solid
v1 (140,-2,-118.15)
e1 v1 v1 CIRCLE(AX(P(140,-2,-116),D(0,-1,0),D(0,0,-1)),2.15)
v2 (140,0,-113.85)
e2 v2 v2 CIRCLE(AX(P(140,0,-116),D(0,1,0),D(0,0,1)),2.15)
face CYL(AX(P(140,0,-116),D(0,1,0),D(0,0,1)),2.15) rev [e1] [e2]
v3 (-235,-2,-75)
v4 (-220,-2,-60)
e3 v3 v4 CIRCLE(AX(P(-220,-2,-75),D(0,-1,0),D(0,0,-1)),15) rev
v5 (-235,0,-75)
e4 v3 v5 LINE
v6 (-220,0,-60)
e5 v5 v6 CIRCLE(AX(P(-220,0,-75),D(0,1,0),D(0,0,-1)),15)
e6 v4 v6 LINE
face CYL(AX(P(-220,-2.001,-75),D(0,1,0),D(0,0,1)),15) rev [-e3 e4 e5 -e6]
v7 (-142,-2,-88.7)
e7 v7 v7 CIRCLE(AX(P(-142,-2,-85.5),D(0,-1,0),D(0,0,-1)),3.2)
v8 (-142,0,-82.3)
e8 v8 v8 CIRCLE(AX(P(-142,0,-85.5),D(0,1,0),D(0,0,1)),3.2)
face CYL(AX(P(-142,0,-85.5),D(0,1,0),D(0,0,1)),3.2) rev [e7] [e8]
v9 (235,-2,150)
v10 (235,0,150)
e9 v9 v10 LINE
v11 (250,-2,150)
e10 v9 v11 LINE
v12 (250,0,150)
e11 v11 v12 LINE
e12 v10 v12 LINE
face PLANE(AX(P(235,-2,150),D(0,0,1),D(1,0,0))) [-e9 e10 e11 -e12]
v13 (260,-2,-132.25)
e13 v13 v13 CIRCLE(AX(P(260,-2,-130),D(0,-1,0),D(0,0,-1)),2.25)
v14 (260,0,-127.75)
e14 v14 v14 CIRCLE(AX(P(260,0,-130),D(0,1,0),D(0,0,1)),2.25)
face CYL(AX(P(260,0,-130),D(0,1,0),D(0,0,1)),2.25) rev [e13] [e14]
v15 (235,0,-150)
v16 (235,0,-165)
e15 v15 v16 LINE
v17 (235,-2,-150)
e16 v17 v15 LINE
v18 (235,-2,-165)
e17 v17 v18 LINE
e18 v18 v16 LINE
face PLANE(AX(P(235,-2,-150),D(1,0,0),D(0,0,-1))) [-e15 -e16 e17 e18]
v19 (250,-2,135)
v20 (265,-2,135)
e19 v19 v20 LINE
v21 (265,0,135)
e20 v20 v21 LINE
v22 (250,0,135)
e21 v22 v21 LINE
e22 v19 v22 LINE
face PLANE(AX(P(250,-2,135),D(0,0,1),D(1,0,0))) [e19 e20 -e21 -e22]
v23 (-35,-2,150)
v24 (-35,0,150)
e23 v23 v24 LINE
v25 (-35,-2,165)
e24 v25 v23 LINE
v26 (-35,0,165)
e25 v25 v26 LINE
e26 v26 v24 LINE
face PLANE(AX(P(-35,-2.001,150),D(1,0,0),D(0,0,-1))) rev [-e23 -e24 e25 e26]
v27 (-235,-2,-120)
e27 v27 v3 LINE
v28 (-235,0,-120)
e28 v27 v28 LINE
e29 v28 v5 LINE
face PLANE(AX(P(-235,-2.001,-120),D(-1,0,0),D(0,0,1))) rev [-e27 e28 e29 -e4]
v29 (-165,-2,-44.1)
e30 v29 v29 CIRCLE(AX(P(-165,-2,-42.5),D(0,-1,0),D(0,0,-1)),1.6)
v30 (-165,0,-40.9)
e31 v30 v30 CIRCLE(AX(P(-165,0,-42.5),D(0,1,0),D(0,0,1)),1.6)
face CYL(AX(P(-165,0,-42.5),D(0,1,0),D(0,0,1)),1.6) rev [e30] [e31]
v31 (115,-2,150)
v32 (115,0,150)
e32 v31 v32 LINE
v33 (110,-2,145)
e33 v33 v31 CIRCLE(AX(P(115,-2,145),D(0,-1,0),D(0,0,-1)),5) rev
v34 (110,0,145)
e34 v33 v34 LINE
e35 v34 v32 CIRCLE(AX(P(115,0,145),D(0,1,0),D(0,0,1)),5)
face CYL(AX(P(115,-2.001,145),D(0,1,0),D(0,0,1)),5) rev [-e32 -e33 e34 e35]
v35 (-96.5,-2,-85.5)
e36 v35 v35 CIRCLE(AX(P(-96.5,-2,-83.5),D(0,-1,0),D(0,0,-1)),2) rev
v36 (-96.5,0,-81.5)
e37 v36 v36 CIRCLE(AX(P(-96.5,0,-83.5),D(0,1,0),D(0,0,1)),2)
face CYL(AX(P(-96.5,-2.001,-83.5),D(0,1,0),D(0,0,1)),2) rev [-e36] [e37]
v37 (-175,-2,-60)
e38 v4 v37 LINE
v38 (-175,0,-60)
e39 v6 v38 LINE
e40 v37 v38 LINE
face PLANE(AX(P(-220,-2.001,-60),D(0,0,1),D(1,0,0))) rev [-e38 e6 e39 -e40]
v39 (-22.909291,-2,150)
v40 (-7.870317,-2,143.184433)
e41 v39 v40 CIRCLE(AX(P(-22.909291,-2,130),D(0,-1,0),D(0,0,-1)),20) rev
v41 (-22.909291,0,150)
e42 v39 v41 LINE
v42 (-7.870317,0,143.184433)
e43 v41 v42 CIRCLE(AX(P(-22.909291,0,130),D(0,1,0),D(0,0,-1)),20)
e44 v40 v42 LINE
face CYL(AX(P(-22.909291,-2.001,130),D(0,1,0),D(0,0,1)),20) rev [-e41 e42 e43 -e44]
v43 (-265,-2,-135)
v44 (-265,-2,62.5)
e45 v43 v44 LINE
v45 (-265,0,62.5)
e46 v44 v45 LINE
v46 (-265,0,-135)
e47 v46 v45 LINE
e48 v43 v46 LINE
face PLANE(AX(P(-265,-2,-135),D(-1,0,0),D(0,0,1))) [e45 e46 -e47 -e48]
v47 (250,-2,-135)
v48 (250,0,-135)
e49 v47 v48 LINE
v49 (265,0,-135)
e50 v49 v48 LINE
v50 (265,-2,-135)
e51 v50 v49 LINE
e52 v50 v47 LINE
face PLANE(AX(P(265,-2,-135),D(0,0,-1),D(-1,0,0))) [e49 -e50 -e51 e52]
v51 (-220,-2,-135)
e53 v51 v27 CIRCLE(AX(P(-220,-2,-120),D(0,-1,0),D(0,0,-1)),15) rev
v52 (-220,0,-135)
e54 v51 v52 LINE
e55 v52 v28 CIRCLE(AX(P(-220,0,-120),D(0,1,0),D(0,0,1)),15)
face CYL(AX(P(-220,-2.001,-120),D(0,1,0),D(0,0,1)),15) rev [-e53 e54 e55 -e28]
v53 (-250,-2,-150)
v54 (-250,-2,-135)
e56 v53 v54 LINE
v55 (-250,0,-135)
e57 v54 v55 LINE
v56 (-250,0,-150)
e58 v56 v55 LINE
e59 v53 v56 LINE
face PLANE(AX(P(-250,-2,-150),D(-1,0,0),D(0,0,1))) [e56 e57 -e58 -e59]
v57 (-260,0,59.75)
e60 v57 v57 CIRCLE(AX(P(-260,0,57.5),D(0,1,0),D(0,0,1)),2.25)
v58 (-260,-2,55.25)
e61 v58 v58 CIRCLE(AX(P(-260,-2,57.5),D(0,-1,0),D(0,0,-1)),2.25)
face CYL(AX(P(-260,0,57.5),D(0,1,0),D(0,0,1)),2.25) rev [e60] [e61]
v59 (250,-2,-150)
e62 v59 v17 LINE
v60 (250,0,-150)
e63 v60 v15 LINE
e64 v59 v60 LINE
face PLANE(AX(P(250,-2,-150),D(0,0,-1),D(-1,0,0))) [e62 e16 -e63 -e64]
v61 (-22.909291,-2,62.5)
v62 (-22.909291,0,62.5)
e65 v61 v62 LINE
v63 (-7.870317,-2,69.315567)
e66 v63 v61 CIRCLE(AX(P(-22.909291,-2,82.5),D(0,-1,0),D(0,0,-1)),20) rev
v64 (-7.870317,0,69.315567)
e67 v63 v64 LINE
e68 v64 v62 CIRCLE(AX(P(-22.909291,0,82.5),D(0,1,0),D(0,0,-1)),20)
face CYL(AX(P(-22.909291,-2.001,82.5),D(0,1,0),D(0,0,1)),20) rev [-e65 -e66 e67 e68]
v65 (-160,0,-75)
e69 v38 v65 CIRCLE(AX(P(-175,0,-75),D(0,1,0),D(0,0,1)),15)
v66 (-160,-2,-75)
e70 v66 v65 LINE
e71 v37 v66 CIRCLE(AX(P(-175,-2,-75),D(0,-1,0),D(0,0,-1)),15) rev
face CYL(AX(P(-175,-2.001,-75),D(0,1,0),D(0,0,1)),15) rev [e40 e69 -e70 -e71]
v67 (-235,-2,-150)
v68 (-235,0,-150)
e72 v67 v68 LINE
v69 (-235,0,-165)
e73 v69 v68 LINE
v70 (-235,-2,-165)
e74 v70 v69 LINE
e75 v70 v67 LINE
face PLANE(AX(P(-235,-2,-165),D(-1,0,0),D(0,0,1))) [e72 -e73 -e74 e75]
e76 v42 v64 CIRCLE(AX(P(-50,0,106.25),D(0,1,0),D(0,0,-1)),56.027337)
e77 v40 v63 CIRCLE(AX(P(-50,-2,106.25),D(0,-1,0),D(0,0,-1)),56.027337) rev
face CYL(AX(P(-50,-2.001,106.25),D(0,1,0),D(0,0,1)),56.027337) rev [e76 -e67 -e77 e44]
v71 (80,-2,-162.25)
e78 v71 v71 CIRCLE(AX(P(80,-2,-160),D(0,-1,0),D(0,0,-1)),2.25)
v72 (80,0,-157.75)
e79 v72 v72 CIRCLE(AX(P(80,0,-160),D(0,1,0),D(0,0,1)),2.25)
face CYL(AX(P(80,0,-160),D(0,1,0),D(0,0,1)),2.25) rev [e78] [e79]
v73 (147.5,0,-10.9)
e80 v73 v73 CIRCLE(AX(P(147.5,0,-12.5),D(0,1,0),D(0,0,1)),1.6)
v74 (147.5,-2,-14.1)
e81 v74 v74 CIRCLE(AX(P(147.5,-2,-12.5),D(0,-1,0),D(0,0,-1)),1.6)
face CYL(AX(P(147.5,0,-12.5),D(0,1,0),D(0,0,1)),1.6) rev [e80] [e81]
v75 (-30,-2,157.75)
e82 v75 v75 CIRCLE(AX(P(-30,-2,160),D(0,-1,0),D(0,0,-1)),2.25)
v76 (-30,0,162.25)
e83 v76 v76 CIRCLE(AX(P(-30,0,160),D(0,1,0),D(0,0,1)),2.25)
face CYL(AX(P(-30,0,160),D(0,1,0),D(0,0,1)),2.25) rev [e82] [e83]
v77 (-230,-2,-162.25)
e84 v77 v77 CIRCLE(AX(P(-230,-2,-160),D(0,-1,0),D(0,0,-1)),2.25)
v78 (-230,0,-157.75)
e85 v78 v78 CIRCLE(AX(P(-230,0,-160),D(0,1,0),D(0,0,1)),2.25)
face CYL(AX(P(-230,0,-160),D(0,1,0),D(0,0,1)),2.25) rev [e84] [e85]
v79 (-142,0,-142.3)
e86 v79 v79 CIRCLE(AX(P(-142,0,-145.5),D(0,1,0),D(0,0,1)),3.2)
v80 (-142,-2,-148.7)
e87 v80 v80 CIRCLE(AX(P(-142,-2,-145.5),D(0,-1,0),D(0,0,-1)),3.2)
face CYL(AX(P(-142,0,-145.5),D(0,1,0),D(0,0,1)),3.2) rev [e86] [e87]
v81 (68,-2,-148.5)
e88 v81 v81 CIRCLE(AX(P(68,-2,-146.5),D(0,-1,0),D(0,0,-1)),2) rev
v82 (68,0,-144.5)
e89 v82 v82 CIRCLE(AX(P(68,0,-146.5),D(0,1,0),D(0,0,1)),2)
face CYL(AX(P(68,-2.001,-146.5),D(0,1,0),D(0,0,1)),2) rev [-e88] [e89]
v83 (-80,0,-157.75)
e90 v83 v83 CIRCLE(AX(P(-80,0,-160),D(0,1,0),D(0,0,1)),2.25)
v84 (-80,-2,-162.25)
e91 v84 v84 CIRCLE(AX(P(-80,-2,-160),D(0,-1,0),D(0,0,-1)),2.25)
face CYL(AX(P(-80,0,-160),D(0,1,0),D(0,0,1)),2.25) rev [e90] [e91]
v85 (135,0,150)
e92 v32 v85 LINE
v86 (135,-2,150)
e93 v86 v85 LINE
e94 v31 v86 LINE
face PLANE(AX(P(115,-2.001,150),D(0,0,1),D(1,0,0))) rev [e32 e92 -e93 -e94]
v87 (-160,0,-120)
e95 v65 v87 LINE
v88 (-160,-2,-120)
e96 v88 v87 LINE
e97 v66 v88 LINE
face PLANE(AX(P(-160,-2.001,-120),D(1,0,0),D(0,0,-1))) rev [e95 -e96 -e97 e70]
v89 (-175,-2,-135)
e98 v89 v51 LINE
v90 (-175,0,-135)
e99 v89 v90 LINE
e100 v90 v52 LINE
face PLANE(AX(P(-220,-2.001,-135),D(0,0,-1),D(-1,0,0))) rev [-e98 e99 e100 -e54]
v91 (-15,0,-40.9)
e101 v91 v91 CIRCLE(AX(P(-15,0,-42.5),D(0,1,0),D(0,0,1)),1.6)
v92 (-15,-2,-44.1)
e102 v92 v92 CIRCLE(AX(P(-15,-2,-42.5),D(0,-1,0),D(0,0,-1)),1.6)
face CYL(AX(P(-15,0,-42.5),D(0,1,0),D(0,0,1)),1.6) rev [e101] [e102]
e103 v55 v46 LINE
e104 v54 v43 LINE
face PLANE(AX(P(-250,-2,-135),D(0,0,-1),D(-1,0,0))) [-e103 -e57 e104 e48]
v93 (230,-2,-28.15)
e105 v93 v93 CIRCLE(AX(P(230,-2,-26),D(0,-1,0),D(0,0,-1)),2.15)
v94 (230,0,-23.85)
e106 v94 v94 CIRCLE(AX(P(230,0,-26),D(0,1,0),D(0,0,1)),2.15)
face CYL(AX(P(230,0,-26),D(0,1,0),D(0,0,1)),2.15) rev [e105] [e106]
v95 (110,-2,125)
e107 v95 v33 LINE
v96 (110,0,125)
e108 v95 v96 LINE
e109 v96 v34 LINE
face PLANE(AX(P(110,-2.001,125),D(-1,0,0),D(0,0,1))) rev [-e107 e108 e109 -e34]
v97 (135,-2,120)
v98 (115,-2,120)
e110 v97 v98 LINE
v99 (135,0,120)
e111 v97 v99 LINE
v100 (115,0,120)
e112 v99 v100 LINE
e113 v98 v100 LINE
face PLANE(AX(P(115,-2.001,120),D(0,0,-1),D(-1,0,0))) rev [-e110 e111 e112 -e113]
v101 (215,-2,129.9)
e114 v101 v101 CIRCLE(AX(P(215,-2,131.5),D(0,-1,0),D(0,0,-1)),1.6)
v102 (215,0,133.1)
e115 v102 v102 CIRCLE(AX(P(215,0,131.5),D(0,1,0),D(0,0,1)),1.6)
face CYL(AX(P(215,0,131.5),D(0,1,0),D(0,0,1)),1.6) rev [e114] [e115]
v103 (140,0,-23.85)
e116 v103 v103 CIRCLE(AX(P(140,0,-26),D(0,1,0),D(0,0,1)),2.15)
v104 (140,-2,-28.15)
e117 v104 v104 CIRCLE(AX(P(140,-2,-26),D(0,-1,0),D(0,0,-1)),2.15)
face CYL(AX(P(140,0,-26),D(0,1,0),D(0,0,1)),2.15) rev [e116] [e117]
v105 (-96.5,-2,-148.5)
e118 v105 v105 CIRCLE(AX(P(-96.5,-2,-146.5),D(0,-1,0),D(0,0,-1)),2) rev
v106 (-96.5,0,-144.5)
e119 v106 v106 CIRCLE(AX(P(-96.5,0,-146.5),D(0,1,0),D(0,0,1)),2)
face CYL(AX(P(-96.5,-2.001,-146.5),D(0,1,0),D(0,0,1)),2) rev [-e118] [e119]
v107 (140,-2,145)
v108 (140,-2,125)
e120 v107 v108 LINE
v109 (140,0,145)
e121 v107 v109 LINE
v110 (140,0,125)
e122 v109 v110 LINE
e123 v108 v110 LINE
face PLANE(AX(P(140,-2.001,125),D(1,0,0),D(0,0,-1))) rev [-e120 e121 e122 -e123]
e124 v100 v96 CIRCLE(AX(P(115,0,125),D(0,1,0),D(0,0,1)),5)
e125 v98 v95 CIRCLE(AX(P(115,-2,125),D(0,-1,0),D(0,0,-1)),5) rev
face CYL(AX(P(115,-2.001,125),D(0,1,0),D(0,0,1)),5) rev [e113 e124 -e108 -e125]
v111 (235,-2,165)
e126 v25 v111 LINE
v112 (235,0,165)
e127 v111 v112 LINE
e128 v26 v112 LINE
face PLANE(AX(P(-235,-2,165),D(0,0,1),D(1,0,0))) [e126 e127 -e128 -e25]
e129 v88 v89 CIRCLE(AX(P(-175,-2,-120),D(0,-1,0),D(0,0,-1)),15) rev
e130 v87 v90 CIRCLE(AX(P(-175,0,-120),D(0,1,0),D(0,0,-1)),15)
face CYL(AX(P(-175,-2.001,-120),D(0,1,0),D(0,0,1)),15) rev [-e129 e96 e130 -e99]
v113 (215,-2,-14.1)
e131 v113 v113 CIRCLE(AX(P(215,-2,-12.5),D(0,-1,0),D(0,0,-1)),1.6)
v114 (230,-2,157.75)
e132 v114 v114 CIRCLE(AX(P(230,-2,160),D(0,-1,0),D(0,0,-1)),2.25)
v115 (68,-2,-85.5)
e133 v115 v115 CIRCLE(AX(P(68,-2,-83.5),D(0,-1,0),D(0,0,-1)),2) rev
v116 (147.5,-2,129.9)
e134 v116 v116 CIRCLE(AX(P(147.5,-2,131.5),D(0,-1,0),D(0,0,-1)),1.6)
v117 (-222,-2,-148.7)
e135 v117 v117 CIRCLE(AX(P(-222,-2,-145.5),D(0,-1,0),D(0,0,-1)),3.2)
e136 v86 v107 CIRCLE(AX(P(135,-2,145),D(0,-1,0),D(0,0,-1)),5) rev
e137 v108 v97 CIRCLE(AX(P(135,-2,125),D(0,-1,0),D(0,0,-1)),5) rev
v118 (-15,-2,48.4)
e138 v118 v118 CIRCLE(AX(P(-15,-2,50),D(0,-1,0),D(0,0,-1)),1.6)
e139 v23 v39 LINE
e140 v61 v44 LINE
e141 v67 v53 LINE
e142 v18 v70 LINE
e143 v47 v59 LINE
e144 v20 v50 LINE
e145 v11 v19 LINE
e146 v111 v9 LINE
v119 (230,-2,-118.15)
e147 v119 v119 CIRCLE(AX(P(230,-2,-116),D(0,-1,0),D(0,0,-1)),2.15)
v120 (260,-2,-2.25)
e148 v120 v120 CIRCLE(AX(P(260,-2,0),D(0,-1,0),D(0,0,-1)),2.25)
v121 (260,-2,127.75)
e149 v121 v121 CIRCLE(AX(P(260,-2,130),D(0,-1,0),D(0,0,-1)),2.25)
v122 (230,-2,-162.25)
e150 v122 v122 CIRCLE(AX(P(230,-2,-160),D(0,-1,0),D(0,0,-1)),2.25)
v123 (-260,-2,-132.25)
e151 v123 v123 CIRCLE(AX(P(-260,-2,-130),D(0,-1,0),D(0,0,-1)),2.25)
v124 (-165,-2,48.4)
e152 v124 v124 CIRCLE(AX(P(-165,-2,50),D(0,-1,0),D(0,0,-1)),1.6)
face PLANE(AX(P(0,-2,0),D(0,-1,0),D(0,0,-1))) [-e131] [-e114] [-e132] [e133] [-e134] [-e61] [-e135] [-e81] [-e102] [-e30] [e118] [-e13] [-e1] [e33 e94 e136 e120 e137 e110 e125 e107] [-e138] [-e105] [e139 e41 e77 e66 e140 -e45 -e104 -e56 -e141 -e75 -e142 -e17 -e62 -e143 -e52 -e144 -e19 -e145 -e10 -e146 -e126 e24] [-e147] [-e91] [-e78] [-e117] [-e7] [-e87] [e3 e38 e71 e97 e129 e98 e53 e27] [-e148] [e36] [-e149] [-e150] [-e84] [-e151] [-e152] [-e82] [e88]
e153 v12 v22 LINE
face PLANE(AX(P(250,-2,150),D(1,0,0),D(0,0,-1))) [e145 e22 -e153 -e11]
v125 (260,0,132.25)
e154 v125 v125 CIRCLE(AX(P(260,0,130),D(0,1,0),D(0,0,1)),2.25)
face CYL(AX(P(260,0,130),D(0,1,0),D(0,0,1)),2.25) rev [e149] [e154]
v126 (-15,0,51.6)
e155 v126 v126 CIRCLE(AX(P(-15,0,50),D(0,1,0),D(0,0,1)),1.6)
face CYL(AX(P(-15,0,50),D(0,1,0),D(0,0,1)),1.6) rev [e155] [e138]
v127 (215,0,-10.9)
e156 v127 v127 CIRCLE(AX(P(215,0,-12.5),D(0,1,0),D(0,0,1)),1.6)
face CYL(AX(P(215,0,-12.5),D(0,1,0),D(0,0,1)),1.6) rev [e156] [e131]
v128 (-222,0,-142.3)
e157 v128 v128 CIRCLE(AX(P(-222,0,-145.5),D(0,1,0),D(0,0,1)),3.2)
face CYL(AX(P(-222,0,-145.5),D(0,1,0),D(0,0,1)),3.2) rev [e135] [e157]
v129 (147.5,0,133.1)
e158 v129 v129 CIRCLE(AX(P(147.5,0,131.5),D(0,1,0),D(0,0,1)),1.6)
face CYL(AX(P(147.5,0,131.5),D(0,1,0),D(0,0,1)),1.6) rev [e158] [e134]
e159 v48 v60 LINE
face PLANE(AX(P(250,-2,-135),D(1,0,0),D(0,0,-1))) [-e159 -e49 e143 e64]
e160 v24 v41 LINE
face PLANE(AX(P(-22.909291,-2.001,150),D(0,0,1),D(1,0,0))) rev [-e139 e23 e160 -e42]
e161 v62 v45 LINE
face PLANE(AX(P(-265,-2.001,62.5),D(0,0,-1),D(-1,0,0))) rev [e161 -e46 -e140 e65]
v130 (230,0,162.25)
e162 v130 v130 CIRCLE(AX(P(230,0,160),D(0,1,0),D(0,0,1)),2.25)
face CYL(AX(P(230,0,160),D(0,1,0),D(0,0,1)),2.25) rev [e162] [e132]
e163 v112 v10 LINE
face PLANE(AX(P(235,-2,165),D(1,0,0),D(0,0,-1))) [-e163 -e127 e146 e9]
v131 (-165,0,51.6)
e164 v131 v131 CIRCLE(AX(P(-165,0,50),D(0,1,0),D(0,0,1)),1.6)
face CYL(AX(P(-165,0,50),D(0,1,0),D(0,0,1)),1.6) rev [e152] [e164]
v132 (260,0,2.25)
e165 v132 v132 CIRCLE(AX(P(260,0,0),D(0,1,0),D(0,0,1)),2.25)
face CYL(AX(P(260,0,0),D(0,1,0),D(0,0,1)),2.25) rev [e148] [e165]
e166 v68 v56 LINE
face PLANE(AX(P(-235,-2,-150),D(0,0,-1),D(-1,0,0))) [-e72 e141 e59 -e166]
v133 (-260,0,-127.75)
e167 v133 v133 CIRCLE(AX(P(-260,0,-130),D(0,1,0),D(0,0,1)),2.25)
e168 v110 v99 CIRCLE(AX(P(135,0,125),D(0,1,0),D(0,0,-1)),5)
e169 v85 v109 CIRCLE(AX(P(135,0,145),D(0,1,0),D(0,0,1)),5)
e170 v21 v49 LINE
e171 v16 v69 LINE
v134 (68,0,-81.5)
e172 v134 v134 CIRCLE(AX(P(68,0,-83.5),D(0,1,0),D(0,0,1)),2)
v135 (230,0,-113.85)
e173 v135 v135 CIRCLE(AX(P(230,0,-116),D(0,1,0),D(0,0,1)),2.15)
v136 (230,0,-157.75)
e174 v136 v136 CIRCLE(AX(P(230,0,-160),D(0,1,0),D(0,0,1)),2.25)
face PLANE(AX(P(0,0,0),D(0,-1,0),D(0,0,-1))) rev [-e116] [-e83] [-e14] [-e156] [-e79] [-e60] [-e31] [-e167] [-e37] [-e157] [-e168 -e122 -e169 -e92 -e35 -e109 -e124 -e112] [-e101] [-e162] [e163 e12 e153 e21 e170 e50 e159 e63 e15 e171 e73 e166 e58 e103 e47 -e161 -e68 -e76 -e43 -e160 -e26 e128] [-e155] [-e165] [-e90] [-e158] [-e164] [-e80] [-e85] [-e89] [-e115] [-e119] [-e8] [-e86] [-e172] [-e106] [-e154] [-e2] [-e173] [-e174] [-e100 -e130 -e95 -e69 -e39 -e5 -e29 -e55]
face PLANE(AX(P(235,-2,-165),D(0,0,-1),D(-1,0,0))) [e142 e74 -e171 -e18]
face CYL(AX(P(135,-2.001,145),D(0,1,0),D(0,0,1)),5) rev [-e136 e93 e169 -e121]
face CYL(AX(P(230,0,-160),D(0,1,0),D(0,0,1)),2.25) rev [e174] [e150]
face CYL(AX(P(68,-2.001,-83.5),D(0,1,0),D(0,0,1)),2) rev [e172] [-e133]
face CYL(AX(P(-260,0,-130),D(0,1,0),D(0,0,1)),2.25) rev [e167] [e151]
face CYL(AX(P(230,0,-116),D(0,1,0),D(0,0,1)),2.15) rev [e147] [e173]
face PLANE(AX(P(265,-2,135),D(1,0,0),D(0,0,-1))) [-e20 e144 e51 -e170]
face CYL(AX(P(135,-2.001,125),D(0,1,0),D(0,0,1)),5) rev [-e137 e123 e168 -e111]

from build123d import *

# Parameters (mm, degrees)
BASE_FLANGE1_DEPTH   = 2
CUT_EXTRUDE1_REACH   = 314.176
CUT_EXTRUDE2_REACH   = 314.176
CUT_EXTRUDE3_REACH   = 314.176
M4_CLEARANCE_HOLE1_D = 4.5
CUT_EXTRUDE4_REACH   = 314.176
SKETCH7_R            = 2
M3_CLEARANCE_HOLE1_D = 3.2
M6_CLEARANCE_HOLE1_D = 6.4
M4_CLEARANCE_HOLE2_D = 4.3


# Sheet-metal steps are written as plain solids
with BuildPart() as part:
    # Sketch1 → Base-Flange1 (new body)
    with BuildSketch(Plane(origin=(0, 0, 0), x_dir=(1, 0, 0), z_dir=(0, 1, 0))):
        Polygon((-250, -150), (-235, -150), (-235, -165), (235, -165), (235, -150), (250, -150), (250, -135), (265, -135), (265, 135), (250, 135), (250, 150), (235, 150), (235, 165), (-235, 165), (-235, 150), (-250, 150), (-250, 135), (-265, 135), (-265, -135), (-250, -135), align=None)
    extrude(amount=-BASE_FLANGE1_DEPTH)

    # Sketch2 → Cut-Extrude1 (cut, up to next)
    with BuildSketch(Plane(origin=(0, 0, 0), x_dir=(1, 0, 0), z_dir=(0, 1, 0)), mode=Mode.PRIVATE) as cut_extrude1_sk1:
        with BuildLine():
            Line((-265, -62.5), (-22.909290949, -62.5))
            ThreePointArc((-22.909290949, -62.5), (-14.653646014, -64.283405184), (-7.870317076, -69.315567329))
            ThreePointArc((-7.870317076, -69.315567329), (6.027337078, -106.25), (-7.870317076, -143.184432671))
            ThreePointArc((-7.870317076, -143.184432671), (-14.653646014, -148.216594816), (-22.909290949, -150))
            Line((-22.909290949, -150), (-35, -150))
            Line((-35, -150), (-35, -165))
            Line((-35, -165), (-265, -165))
            Line((-265, -165), (-265, -62.5))
        make_face()
    cut_extrude1_tool1 = extrude(cut_extrude1_sk1.sketch, amount=-CUT_EXTRUDE1_REACH, mode=Mode.PRIVATE) & part.part
    add(cut_extrude1_tool1.solids().sort_by_distance((-134.940793, 0, 112.899741))[0], mode=Mode.SUBTRACT)

    # Sketch3 → Cut-Extrude2 (cut, up to next)
    with BuildSketch(Plane(origin=(0, 0, 0), x_dir=(1, 0, 0), z_dir=(0, 1, 0)), mode=Mode.PRIVATE) as cut_extrude2_sk1:
        with BuildLine():
            Line((-220, 135), (-175, 135))
            ThreePointArc((-175, 135), (-164.393398282, 130.606601718), (-160, 120))
            Line((-160, 120), (-160, 75))
            ThreePointArc((-160, 75), (-164.393398282, 64.393398282), (-175, 60))
            Line((-175, 60), (-220, 60))
            ThreePointArc((-220, 60), (-230.606601718, 64.393398282), (-235, 75))
            Line((-235, 75), (-235, 120))
            ThreePointArc((-235, 120), (-230.606601718, 130.606601718), (-220, 135))
        make_face()
    cut_extrude2_tool1 = extrude(cut_extrude2_sk1.sketch, amount=-CUT_EXTRUDE2_REACH, mode=Mode.PRIVATE) & part.part
    add(cut_extrude2_tool1.solids().sort_by_distance((-197.5, 0, -97.5))[0], mode=Mode.SUBTRACT)

    # Sketch4 → Cut-Extrude3 (cut, up to next)
    with BuildSketch(Plane(origin=(0, 0, 0), x_dir=(1, 0, 0), z_dir=(0, 1, 0)), mode=Mode.PRIVATE) as cut_extrude3_sk1:
        with BuildLine():
            Line((115, -120), (135, -120))
            ThreePointArc((135, -120), (138.535533906, -121.464466094), (140, -125))
            Line((140, -125), (140, -145))
            ThreePointArc((140, -145), (138.535533906, -148.535533906), (135, -150))
            Line((135, -150), (115, -150))
            ThreePointArc((115, -150), (111.464466094, -148.535533906), (110, -145))
            Line((110, -145), (110, -125))
            ThreePointArc((110, -125), (111.464466094, -121.464466094), (115, -120))
        make_face()
    cut_extrude3_tool1 = extrude(cut_extrude3_sk1.sketch, amount=-CUT_EXTRUDE3_REACH, mode=Mode.PRIVATE) & part.part
    add(cut_extrude3_tool1.solids().sort_by_distance((125, 0, 135))[0], mode=Mode.SUBTRACT)

    # M4 Clearance Hole1 (through all)
    with Locations(Plane(origin=(0, 0, 0), x_dir=(1, 0, 0), z_dir=(0, 1, 0))):
        with Locations((-230, 160), (-80, 160), (80, 160), (230, 160), (260, 130), (260, 0), (260, -130), (230, -160), (-30, -160), (-260, 130), (-260, -57.5)):
            Hole(M4_CLEARANCE_HOLE1_D / 2)

    # Sketch7 → Cut-Extrude4 (cut, up to next)
    with BuildSketch(Plane(origin=(0, 0, 0), x_dir=(1, 0, 0), z_dir=(0, 1, 0)), mode=Mode.PRIVATE) as cut_extrude4_sk1:
        with Locations(Location((-96.5, 146.5, 0), (0, 0, 270))):
            Circle(SKETCH7_R)
    cut_extrude4_tool1 = extrude(cut_extrude4_sk1.sketch, amount=-CUT_EXTRUDE4_REACH, mode=Mode.PRIVATE) & part.part
    # Sketch7 → Cut-Extrude4 (cut, up to next)
    with BuildSketch(Plane(origin=(0, 0, 0), x_dir=(1, 0, 0), z_dir=(0, 1, 0)), mode=Mode.PRIVATE) as cut_extrude4_sk2:
        with Locations(Location((-96.5, 83.5, 0), (0, 0, 270))):
            Circle(SKETCH7_R)
    cut_extrude4_tool2 = extrude(cut_extrude4_sk2.sketch, amount=-CUT_EXTRUDE4_REACH, mode=Mode.PRIVATE) & part.part
    # Sketch7 → Cut-Extrude4 (cut, up to next)
    with BuildSketch(Plane(origin=(0, 0, 0), x_dir=(1, 0, 0), z_dir=(0, 1, 0)), mode=Mode.PRIVATE) as cut_extrude4_sk3:
        with Locations(Location((68, 83.5, 0), (0, 0, 270))):
            Circle(SKETCH7_R)
    cut_extrude4_tool3 = extrude(cut_extrude4_sk3.sketch, amount=-CUT_EXTRUDE4_REACH, mode=Mode.PRIVATE) & part.part
    # Sketch7 → Cut-Extrude4 (cut, up to next)
    with BuildSketch(Plane(origin=(0, 0, 0), x_dir=(1, 0, 0), z_dir=(0, 1, 0)), mode=Mode.PRIVATE) as cut_extrude4_sk4:
        with Locations(Location((68, 146.5, 0), (0, 0, 270))):
            Circle(SKETCH7_R)
    cut_extrude4_tool4 = extrude(cut_extrude4_sk4.sketch, amount=-CUT_EXTRUDE4_REACH, mode=Mode.PRIVATE) & part.part
    add(cut_extrude4_tool1.solids().sort_by_distance((-96.5, 0, -146.5))[0], mode=Mode.SUBTRACT)
    add(cut_extrude4_tool2.solids().sort_by_distance((-96.5, 0, -83.5))[0], mode=Mode.SUBTRACT)
    add(cut_extrude4_tool3.solids().sort_by_distance((68, 0, -83.5))[0], mode=Mode.SUBTRACT)
    add(cut_extrude4_tool4.solids().sort_by_distance((68, 0, -146.5))[0], mode=Mode.SUBTRACT)

    # M3 Clearance Hole1 (through all)
    with Locations(Plane(origin=(0, 0, 0), x_dir=(1, 0, 0), z_dir=(0, 1, 0))):
        with Locations((147.5, 12.5), (215, -131.5), (147.5, -131.5), (215, 12.5), (-15, -50), (-165, 42.5), (-15, 42.5), (-165, -50)):
            Hole(M3_CLEARANCE_HOLE1_D / 2)

    # M6 Clearance Hole1 (through all)
    with Locations(Plane(origin=(0, 0, 0), x_dir=(1, 0, 0), z_dir=(0, 1, 0))):
        with Locations((-142, 145.5), (-222, 145.5), (-142, 85.5)):
            Hole(M6_CLEARANCE_HOLE1_D / 2)

    # M4 Clearance Hole2 (through all)
    with Locations(Plane(origin=(0, 0, 0), x_dir=(1, 0, 0), z_dir=(0, 1, 0))):
        with Locations((230, 116), (140, 26), (230, 26), (140, 116)):
            Hole(M4_CLEARANCE_HOLE2_D / 2)


solid = part.part
